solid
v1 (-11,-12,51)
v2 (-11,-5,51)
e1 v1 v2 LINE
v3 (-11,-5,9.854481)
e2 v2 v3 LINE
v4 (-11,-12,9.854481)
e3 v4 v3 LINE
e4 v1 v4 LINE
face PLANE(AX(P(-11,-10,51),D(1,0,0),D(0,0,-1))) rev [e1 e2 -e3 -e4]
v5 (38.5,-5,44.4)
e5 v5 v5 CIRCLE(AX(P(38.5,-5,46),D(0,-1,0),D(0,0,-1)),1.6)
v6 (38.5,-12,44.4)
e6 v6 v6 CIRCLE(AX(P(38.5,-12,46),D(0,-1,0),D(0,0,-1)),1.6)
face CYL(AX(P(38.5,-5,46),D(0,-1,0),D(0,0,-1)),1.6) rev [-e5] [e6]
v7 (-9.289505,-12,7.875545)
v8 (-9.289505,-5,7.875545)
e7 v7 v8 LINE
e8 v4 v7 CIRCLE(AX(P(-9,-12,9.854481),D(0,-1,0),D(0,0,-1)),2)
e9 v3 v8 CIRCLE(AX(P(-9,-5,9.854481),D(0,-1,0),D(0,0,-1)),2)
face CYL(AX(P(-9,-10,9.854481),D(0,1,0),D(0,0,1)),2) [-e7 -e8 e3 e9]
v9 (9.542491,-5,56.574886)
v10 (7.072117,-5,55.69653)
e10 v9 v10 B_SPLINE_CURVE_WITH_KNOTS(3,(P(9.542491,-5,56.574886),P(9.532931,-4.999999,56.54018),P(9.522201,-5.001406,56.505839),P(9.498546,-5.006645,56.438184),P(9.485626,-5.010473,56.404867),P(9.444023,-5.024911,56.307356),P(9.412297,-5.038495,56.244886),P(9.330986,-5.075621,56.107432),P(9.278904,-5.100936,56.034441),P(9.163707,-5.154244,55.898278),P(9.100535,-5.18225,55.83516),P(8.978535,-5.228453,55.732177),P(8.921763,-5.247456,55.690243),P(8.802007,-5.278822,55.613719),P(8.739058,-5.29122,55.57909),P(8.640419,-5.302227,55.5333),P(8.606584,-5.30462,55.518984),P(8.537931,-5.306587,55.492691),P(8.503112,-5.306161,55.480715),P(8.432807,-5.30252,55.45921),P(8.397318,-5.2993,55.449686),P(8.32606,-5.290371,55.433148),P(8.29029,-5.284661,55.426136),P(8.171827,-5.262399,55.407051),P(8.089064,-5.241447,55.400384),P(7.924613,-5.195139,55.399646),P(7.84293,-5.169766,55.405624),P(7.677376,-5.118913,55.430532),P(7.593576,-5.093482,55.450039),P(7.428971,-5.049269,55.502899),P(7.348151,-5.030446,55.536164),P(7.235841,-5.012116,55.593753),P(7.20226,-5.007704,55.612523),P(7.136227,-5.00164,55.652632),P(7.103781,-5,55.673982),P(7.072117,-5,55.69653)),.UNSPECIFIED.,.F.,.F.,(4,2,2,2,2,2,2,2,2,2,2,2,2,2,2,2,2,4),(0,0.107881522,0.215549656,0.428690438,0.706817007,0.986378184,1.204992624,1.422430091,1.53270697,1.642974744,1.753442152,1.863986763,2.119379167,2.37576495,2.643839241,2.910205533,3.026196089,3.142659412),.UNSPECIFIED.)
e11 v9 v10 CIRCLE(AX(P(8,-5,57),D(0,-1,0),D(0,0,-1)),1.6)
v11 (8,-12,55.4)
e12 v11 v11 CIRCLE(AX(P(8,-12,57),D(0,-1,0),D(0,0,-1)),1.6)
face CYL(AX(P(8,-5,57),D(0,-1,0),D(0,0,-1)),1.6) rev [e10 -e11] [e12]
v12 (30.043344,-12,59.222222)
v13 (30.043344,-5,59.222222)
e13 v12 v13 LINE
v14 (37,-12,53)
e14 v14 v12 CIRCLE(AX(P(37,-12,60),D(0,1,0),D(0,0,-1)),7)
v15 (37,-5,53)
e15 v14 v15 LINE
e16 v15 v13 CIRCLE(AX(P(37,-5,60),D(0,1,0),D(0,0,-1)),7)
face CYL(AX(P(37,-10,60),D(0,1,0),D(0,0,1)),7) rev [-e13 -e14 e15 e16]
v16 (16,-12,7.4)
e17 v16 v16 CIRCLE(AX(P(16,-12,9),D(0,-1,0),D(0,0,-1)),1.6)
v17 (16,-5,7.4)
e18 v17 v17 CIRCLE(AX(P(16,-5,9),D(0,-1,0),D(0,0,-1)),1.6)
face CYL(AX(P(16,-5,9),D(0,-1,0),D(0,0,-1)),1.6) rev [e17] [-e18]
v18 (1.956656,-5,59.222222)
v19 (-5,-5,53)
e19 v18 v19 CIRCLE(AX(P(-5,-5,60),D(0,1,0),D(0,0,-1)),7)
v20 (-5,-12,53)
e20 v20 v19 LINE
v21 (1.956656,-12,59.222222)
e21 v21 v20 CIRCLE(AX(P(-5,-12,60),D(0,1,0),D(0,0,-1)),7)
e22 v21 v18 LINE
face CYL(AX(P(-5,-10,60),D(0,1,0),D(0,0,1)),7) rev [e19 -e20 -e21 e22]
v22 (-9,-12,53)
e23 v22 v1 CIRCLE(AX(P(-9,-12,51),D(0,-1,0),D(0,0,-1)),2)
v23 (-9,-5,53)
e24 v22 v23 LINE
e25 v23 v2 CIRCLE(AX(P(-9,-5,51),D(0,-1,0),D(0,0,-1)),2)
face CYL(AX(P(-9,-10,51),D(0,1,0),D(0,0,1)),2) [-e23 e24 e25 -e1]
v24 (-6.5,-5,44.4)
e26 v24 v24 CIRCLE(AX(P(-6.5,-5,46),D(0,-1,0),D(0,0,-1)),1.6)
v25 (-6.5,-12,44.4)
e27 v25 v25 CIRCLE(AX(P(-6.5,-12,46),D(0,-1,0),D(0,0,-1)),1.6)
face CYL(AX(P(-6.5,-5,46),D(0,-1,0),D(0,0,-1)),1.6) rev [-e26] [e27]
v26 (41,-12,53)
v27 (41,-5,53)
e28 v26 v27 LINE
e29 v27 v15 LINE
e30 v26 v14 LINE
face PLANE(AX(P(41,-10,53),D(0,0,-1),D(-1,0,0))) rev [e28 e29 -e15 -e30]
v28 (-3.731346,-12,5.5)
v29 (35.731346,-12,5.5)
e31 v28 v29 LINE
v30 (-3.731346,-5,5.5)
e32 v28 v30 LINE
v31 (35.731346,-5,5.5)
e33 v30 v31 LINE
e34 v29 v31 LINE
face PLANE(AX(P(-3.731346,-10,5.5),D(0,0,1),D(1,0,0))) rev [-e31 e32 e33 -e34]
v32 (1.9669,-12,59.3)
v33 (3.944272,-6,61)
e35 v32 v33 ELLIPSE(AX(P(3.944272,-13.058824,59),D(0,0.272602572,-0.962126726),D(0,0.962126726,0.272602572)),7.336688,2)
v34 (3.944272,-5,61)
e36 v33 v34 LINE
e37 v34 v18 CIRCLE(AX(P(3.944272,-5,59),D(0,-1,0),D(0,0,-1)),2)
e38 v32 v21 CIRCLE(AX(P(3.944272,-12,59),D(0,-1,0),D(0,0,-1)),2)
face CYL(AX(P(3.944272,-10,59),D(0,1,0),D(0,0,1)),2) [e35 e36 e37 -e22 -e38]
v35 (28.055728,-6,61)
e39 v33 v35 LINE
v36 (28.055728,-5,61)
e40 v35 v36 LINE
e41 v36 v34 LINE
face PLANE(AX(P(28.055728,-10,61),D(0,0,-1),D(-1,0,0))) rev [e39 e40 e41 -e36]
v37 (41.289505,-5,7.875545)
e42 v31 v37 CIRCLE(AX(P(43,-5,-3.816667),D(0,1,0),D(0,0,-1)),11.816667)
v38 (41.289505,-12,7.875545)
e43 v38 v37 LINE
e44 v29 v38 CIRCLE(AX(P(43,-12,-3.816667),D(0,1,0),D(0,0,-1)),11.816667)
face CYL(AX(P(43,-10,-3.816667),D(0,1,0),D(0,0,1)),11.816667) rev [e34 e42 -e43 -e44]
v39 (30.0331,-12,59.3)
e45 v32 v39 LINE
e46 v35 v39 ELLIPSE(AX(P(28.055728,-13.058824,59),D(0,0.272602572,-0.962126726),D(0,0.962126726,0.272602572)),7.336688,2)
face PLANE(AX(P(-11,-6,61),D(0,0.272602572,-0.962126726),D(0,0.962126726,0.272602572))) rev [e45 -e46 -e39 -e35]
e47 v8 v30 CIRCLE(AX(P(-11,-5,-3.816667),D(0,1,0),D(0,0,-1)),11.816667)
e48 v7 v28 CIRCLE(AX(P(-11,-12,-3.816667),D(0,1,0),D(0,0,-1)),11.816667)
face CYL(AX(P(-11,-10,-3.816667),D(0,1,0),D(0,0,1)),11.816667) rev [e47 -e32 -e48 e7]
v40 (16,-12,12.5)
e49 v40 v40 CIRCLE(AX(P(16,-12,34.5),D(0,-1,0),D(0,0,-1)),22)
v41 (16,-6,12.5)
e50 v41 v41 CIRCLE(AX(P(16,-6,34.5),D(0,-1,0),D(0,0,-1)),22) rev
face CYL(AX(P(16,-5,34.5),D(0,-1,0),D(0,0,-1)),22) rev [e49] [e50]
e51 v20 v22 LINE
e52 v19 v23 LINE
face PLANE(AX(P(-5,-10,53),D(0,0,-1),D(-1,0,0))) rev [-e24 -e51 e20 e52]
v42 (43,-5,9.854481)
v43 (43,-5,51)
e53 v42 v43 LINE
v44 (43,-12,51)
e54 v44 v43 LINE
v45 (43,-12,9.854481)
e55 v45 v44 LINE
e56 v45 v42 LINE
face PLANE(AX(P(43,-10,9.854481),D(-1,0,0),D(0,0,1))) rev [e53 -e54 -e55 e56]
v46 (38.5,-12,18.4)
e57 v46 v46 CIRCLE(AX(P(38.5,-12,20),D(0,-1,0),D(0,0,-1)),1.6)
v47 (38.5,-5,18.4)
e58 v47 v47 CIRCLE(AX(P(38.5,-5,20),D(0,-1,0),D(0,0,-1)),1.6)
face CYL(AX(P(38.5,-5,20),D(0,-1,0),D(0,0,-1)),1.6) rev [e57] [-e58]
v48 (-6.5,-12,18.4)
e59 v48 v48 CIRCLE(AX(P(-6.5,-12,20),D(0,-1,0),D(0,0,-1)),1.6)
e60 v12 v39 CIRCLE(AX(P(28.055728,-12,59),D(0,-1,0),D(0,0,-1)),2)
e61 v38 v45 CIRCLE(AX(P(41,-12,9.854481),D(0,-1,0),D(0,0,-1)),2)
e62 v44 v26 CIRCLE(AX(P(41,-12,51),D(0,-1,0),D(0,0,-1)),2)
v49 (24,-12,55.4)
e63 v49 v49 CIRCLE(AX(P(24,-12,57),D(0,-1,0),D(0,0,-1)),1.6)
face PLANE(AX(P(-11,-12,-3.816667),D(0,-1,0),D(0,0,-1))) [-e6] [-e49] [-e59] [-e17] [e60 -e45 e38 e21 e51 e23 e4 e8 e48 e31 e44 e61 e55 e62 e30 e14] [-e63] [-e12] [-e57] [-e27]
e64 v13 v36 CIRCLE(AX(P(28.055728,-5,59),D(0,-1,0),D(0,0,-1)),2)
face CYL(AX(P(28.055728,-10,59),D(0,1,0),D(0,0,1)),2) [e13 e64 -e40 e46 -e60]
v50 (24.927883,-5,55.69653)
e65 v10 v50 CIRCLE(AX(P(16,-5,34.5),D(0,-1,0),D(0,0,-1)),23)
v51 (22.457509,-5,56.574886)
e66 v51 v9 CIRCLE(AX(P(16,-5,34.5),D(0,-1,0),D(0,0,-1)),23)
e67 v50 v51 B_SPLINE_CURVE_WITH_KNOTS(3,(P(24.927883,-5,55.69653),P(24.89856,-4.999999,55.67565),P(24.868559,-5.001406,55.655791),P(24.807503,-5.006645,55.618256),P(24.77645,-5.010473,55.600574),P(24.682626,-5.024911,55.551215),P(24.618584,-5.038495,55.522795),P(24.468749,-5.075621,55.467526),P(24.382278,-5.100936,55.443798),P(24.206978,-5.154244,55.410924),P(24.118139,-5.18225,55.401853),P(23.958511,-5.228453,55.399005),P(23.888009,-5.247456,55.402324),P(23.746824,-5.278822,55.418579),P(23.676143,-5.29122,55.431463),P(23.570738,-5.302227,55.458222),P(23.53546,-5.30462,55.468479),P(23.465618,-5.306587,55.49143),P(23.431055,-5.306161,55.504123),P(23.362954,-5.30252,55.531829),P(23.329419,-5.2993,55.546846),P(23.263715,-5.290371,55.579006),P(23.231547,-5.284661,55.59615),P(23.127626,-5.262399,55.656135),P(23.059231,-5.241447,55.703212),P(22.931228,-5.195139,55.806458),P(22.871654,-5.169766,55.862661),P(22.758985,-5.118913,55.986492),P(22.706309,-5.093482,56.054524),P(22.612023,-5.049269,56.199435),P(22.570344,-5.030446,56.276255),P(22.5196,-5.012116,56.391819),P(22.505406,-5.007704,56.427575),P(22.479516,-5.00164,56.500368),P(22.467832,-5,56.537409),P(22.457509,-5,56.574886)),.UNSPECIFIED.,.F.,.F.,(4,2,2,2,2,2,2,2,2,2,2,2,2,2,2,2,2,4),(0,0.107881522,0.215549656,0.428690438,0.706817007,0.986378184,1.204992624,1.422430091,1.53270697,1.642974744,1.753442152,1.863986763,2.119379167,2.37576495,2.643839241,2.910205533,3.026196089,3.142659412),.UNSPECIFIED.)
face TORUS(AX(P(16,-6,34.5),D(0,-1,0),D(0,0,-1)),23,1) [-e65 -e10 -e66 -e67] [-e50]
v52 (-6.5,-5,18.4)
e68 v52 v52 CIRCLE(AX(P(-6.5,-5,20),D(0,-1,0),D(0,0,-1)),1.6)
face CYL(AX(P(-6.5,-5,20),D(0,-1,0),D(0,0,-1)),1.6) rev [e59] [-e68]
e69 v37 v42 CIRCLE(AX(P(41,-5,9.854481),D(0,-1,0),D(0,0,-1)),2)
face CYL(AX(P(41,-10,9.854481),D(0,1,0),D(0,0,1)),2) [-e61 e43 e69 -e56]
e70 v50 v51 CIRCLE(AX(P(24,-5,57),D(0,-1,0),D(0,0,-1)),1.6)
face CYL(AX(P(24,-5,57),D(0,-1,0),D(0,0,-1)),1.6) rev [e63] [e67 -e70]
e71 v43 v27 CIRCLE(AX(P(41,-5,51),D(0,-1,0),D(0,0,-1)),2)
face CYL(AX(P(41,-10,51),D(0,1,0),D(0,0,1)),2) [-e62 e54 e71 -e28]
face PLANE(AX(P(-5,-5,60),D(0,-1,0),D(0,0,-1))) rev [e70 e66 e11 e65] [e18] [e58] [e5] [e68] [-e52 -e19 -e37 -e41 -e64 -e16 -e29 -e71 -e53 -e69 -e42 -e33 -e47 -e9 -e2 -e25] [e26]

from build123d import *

# Parameters (mm, degrees)
EXTRUDE_1_DEPTH          = 5
SKETCH_3_R               = 22
CUT_EXTRUDE_1_DEPTH      = 75.79973262
SKETCH_4_R               = 1.6
CUT_EXTRUDE_3_DEPTH      = 75.79973262
SKETCH_9_R               = 1.6
SKETCH_9_R_2             = 22
EXTRUDE_2_DEPTH          = 2
FILLET_1_R               = 1
CUT_EXTRUDE_4_DEPTH      = 68.779052811
CUT_EXTRUDE_4_DEPTH_BACK = 68.779052811


with BuildPart() as part:
    # Эскиз2 → Бобышка-Вытянуть1 (new body)
    with BuildSketch(Plane(origin=(0, -5, 0), x_dir=(-1, 0, 0), z_dir=(0, -1, 0))):
        with BuildLine():
            Line((-28.05572809, -61), (-3.94427191, -61))
            ThreePointArc((-3.94427191, -61), (-2.610938577, -60.490711985), (-1.95665593, -59.222222222))
            ThreePointArc((-1.95665593, -59.222222222), (0.333333333, -54.782508053), (5, -53))
            Line((5, -53), (9, -53))
            ThreePointArc((9, -53), (10.414213562, -52.414213562), (11, -51))
            Line((11, -51), (11, -9.854480973))
            ThreePointArc((11, -9.854480973), (10.513111175, -8.546622199), (9.289505428, -7.875545247))
            ThreePointArc((9.289505428, -7.875545247), (6.355962769, -7.049175653), (3.731345838, -5.5))
            Line((3.731345838, -5.5), (-35.731345838, -5.5))
            ThreePointArc((-35.731345838, -5.5), (-38.355962769, -7.049175653), (-41.289505428, -7.875545247))
            ThreePointArc((-41.289505428, -7.875545247), (-42.513111175, -8.546622199), (-43, -9.854480973))
            Line((-43, -9.854480973), (-43, -51))
            ThreePointArc((-43, -51), (-42.414213562, -52.414213562), (-41, -53))
            Line((-41, -53), (-37, -53))
            ThreePointArc((-37, -53), (-32.333333333, -54.782508053), (-30.04334407, -59.222222222))
            ThreePointArc((-30.04334407, -59.222222222), (-29.389061423, -60.490711985), (-28.05572809, -61))
        make_face()
    extrude(amount=EXTRUDE_1_DEPTH)

    # Эскиз3 → Вырез-Вытянуть1 (cut, through all)
    with BuildSketch(Plane.XZ.offset(10)):
        with Locations(Location((16, 34.5, 0), (0, 0, 270))):
            Circle(SKETCH_3_R)
    extrude(amount=-CUT_EXTRUDE_1_DEPTH, mode=Mode.SUBTRACT)

    # Эскиз4 → Вырез-Вытянуть3 (cut, through all)
    with BuildSketch(Plane.XZ.offset(10)):
        with Locations(Location((38.5, 20, 0), (0, 0, 270))):
            Circle(SKETCH_4_R)
        with Locations(Location((-6.5, 20, 0), (0, 0, 270))):
            Circle(SKETCH_4_R)
        with Locations(Location((-6.5, 46, 0), (0, 0, 270))):
            Circle(SKETCH_4_R)
        with Locations(Location((38.5, 46, 0), (0, 0, 270))):
            Circle(SKETCH_4_R)
        with Locations(Location((24, 57, 0), (0, 0, 270))):
            Circle(SKETCH_4_R)
        with Locations(Location((8, 57, 0), (0, 0, 270))):
            Circle(SKETCH_4_R)
        with Locations(Location((16, 9, 0), (0, 0, 270))):
            Circle(SKETCH_4_R)
    extrude(amount=-CUT_EXTRUDE_3_DEPTH, mode=Mode.SUBTRACT)

    # Эскиз9 → Бобышка-Вытянуть2 (add)
    with BuildSketch(Plane.XZ.offset(10)):
        with BuildLine():
            Line((28.05572809, 61), (3.94427191, 61))
            ThreePointArc((3.94427191, 61), (2.610938577, 60.490711985), (1.95665593, 59.222222222))
            ThreePointArc((1.95665593, 59.222222222), (-0.333333333, 54.782508053), (-5, 53))
            Line((-5, 53), (-9, 53))
            ThreePointArc((-9, 53), (-10.414213562, 52.414213562), (-11, 51))
            Line((-11, 51), (-11, 9.854480973))
            ThreePointArc((-11, 9.854480973), (-10.513111175, 8.546622199), (-9.289505428, 7.875545247))
            ThreePointArc((-9.289505428, 7.875545247), (-6.355962769, 7.049175653), (-3.731345838, 5.5))
            Line((-3.731345838, 5.5), (35.731345838, 5.5))
            ThreePointArc((35.731345838, 5.5), (38.355962769, 7.049175653), (41.289505428, 7.875545247))
            ThreePointArc((41.289505428, 7.875545247), (42.513111175, 8.546622199), (43, 9.854480973))
            Line((43, 9.854480973), (43, 51))
            ThreePointArc((43, 51), (42.414213562, 52.414213562), (41, 53))
            Line((41, 53), (37, 53))
            ThreePointArc((37, 53), (32.333333333, 54.782508053), (30.04334407, 59.222222222))
            ThreePointArc((30.04334407, 59.222222222), (29.389061423, 60.490711985), (28.05572809, 61))
        make_face()
        with Locations(Location((38.5, 46, 0), (0, 0, 270))):
            Circle(SKETCH_9_R, mode=Mode.SUBTRACT)
        with Locations(Location((24, 57, 0), (0, 0, 270))):
            Circle(SKETCH_9_R, mode=Mode.SUBTRACT)
        with Locations(Location((38.5, 20, 0), (0, 0, 270))):
            Circle(SKETCH_9_R, mode=Mode.SUBTRACT)
        with Locations(Location((16, 9, 0), (0, 0, 270))):
            Circle(SKETCH_9_R, mode=Mode.SUBTRACT)
        with Locations(Location((-6.5, 20, 0), (0, 0, 270))):
            Circle(SKETCH_9_R, mode=Mode.SUBTRACT)
        with Locations(Location((-6.5, 46, 0), (0, 0, 270))):
            Circle(SKETCH_9_R, mode=Mode.SUBTRACT)
        with Locations(Location((8, 57, 0), (0, 0, 270))):
            Circle(SKETCH_9_R, mode=Mode.SUBTRACT)
        with Locations(Location((16, 34.5, 0), (0, 0, 270))):
            Circle(SKETCH_9_R_2, mode=Mode.SUBTRACT)
    extrude(amount=EXTRUDE_2_DEPTH)

    # Скругление1
    # the kernel refuses this fillet: 1 mm, written as the material it takes off along each edge
    with BuildSketch(Plane(origin=(16, -5, 34.5), x_dir=(0, 0, -1), z_dir=(-1, 0, 0))) as fillet_1_piece_1:
        with BuildLine():
            CenterArc((22 + FILLET_1_R, FILLET_1_R), FILLET_1_R, 180, 90)
            Line((22, FILLET_1_R), (22, 0))
            Line((22, 0), (22 + FILLET_1_R, 0))
        make_face()
    revolve(axis=Axis((16, -5, 34.5), (0, -1, 0)), mode=Mode.SUBTRACT)

    # Эскиз12 → Вырез-Вытянуть4 (cut, two sides: drawn at the far end of the back side and taken through both)
    with BuildSketch(Plane(origin=(16, 0, 0), x_dir=(0, 0, 1), z_dir=(1, 0, 0)).offset(-CUT_EXTRUDE_4_DEPTH_BACK)):
        Polygon((61, 12), (61, 6), (59.3, 12), align=None)
    extrude(amount=CUT_EXTRUDE_4_DEPTH + CUT_EXTRUDE_4_DEPTH_BACK, mode=Mode.SUBTRACT)


solid = part.part
